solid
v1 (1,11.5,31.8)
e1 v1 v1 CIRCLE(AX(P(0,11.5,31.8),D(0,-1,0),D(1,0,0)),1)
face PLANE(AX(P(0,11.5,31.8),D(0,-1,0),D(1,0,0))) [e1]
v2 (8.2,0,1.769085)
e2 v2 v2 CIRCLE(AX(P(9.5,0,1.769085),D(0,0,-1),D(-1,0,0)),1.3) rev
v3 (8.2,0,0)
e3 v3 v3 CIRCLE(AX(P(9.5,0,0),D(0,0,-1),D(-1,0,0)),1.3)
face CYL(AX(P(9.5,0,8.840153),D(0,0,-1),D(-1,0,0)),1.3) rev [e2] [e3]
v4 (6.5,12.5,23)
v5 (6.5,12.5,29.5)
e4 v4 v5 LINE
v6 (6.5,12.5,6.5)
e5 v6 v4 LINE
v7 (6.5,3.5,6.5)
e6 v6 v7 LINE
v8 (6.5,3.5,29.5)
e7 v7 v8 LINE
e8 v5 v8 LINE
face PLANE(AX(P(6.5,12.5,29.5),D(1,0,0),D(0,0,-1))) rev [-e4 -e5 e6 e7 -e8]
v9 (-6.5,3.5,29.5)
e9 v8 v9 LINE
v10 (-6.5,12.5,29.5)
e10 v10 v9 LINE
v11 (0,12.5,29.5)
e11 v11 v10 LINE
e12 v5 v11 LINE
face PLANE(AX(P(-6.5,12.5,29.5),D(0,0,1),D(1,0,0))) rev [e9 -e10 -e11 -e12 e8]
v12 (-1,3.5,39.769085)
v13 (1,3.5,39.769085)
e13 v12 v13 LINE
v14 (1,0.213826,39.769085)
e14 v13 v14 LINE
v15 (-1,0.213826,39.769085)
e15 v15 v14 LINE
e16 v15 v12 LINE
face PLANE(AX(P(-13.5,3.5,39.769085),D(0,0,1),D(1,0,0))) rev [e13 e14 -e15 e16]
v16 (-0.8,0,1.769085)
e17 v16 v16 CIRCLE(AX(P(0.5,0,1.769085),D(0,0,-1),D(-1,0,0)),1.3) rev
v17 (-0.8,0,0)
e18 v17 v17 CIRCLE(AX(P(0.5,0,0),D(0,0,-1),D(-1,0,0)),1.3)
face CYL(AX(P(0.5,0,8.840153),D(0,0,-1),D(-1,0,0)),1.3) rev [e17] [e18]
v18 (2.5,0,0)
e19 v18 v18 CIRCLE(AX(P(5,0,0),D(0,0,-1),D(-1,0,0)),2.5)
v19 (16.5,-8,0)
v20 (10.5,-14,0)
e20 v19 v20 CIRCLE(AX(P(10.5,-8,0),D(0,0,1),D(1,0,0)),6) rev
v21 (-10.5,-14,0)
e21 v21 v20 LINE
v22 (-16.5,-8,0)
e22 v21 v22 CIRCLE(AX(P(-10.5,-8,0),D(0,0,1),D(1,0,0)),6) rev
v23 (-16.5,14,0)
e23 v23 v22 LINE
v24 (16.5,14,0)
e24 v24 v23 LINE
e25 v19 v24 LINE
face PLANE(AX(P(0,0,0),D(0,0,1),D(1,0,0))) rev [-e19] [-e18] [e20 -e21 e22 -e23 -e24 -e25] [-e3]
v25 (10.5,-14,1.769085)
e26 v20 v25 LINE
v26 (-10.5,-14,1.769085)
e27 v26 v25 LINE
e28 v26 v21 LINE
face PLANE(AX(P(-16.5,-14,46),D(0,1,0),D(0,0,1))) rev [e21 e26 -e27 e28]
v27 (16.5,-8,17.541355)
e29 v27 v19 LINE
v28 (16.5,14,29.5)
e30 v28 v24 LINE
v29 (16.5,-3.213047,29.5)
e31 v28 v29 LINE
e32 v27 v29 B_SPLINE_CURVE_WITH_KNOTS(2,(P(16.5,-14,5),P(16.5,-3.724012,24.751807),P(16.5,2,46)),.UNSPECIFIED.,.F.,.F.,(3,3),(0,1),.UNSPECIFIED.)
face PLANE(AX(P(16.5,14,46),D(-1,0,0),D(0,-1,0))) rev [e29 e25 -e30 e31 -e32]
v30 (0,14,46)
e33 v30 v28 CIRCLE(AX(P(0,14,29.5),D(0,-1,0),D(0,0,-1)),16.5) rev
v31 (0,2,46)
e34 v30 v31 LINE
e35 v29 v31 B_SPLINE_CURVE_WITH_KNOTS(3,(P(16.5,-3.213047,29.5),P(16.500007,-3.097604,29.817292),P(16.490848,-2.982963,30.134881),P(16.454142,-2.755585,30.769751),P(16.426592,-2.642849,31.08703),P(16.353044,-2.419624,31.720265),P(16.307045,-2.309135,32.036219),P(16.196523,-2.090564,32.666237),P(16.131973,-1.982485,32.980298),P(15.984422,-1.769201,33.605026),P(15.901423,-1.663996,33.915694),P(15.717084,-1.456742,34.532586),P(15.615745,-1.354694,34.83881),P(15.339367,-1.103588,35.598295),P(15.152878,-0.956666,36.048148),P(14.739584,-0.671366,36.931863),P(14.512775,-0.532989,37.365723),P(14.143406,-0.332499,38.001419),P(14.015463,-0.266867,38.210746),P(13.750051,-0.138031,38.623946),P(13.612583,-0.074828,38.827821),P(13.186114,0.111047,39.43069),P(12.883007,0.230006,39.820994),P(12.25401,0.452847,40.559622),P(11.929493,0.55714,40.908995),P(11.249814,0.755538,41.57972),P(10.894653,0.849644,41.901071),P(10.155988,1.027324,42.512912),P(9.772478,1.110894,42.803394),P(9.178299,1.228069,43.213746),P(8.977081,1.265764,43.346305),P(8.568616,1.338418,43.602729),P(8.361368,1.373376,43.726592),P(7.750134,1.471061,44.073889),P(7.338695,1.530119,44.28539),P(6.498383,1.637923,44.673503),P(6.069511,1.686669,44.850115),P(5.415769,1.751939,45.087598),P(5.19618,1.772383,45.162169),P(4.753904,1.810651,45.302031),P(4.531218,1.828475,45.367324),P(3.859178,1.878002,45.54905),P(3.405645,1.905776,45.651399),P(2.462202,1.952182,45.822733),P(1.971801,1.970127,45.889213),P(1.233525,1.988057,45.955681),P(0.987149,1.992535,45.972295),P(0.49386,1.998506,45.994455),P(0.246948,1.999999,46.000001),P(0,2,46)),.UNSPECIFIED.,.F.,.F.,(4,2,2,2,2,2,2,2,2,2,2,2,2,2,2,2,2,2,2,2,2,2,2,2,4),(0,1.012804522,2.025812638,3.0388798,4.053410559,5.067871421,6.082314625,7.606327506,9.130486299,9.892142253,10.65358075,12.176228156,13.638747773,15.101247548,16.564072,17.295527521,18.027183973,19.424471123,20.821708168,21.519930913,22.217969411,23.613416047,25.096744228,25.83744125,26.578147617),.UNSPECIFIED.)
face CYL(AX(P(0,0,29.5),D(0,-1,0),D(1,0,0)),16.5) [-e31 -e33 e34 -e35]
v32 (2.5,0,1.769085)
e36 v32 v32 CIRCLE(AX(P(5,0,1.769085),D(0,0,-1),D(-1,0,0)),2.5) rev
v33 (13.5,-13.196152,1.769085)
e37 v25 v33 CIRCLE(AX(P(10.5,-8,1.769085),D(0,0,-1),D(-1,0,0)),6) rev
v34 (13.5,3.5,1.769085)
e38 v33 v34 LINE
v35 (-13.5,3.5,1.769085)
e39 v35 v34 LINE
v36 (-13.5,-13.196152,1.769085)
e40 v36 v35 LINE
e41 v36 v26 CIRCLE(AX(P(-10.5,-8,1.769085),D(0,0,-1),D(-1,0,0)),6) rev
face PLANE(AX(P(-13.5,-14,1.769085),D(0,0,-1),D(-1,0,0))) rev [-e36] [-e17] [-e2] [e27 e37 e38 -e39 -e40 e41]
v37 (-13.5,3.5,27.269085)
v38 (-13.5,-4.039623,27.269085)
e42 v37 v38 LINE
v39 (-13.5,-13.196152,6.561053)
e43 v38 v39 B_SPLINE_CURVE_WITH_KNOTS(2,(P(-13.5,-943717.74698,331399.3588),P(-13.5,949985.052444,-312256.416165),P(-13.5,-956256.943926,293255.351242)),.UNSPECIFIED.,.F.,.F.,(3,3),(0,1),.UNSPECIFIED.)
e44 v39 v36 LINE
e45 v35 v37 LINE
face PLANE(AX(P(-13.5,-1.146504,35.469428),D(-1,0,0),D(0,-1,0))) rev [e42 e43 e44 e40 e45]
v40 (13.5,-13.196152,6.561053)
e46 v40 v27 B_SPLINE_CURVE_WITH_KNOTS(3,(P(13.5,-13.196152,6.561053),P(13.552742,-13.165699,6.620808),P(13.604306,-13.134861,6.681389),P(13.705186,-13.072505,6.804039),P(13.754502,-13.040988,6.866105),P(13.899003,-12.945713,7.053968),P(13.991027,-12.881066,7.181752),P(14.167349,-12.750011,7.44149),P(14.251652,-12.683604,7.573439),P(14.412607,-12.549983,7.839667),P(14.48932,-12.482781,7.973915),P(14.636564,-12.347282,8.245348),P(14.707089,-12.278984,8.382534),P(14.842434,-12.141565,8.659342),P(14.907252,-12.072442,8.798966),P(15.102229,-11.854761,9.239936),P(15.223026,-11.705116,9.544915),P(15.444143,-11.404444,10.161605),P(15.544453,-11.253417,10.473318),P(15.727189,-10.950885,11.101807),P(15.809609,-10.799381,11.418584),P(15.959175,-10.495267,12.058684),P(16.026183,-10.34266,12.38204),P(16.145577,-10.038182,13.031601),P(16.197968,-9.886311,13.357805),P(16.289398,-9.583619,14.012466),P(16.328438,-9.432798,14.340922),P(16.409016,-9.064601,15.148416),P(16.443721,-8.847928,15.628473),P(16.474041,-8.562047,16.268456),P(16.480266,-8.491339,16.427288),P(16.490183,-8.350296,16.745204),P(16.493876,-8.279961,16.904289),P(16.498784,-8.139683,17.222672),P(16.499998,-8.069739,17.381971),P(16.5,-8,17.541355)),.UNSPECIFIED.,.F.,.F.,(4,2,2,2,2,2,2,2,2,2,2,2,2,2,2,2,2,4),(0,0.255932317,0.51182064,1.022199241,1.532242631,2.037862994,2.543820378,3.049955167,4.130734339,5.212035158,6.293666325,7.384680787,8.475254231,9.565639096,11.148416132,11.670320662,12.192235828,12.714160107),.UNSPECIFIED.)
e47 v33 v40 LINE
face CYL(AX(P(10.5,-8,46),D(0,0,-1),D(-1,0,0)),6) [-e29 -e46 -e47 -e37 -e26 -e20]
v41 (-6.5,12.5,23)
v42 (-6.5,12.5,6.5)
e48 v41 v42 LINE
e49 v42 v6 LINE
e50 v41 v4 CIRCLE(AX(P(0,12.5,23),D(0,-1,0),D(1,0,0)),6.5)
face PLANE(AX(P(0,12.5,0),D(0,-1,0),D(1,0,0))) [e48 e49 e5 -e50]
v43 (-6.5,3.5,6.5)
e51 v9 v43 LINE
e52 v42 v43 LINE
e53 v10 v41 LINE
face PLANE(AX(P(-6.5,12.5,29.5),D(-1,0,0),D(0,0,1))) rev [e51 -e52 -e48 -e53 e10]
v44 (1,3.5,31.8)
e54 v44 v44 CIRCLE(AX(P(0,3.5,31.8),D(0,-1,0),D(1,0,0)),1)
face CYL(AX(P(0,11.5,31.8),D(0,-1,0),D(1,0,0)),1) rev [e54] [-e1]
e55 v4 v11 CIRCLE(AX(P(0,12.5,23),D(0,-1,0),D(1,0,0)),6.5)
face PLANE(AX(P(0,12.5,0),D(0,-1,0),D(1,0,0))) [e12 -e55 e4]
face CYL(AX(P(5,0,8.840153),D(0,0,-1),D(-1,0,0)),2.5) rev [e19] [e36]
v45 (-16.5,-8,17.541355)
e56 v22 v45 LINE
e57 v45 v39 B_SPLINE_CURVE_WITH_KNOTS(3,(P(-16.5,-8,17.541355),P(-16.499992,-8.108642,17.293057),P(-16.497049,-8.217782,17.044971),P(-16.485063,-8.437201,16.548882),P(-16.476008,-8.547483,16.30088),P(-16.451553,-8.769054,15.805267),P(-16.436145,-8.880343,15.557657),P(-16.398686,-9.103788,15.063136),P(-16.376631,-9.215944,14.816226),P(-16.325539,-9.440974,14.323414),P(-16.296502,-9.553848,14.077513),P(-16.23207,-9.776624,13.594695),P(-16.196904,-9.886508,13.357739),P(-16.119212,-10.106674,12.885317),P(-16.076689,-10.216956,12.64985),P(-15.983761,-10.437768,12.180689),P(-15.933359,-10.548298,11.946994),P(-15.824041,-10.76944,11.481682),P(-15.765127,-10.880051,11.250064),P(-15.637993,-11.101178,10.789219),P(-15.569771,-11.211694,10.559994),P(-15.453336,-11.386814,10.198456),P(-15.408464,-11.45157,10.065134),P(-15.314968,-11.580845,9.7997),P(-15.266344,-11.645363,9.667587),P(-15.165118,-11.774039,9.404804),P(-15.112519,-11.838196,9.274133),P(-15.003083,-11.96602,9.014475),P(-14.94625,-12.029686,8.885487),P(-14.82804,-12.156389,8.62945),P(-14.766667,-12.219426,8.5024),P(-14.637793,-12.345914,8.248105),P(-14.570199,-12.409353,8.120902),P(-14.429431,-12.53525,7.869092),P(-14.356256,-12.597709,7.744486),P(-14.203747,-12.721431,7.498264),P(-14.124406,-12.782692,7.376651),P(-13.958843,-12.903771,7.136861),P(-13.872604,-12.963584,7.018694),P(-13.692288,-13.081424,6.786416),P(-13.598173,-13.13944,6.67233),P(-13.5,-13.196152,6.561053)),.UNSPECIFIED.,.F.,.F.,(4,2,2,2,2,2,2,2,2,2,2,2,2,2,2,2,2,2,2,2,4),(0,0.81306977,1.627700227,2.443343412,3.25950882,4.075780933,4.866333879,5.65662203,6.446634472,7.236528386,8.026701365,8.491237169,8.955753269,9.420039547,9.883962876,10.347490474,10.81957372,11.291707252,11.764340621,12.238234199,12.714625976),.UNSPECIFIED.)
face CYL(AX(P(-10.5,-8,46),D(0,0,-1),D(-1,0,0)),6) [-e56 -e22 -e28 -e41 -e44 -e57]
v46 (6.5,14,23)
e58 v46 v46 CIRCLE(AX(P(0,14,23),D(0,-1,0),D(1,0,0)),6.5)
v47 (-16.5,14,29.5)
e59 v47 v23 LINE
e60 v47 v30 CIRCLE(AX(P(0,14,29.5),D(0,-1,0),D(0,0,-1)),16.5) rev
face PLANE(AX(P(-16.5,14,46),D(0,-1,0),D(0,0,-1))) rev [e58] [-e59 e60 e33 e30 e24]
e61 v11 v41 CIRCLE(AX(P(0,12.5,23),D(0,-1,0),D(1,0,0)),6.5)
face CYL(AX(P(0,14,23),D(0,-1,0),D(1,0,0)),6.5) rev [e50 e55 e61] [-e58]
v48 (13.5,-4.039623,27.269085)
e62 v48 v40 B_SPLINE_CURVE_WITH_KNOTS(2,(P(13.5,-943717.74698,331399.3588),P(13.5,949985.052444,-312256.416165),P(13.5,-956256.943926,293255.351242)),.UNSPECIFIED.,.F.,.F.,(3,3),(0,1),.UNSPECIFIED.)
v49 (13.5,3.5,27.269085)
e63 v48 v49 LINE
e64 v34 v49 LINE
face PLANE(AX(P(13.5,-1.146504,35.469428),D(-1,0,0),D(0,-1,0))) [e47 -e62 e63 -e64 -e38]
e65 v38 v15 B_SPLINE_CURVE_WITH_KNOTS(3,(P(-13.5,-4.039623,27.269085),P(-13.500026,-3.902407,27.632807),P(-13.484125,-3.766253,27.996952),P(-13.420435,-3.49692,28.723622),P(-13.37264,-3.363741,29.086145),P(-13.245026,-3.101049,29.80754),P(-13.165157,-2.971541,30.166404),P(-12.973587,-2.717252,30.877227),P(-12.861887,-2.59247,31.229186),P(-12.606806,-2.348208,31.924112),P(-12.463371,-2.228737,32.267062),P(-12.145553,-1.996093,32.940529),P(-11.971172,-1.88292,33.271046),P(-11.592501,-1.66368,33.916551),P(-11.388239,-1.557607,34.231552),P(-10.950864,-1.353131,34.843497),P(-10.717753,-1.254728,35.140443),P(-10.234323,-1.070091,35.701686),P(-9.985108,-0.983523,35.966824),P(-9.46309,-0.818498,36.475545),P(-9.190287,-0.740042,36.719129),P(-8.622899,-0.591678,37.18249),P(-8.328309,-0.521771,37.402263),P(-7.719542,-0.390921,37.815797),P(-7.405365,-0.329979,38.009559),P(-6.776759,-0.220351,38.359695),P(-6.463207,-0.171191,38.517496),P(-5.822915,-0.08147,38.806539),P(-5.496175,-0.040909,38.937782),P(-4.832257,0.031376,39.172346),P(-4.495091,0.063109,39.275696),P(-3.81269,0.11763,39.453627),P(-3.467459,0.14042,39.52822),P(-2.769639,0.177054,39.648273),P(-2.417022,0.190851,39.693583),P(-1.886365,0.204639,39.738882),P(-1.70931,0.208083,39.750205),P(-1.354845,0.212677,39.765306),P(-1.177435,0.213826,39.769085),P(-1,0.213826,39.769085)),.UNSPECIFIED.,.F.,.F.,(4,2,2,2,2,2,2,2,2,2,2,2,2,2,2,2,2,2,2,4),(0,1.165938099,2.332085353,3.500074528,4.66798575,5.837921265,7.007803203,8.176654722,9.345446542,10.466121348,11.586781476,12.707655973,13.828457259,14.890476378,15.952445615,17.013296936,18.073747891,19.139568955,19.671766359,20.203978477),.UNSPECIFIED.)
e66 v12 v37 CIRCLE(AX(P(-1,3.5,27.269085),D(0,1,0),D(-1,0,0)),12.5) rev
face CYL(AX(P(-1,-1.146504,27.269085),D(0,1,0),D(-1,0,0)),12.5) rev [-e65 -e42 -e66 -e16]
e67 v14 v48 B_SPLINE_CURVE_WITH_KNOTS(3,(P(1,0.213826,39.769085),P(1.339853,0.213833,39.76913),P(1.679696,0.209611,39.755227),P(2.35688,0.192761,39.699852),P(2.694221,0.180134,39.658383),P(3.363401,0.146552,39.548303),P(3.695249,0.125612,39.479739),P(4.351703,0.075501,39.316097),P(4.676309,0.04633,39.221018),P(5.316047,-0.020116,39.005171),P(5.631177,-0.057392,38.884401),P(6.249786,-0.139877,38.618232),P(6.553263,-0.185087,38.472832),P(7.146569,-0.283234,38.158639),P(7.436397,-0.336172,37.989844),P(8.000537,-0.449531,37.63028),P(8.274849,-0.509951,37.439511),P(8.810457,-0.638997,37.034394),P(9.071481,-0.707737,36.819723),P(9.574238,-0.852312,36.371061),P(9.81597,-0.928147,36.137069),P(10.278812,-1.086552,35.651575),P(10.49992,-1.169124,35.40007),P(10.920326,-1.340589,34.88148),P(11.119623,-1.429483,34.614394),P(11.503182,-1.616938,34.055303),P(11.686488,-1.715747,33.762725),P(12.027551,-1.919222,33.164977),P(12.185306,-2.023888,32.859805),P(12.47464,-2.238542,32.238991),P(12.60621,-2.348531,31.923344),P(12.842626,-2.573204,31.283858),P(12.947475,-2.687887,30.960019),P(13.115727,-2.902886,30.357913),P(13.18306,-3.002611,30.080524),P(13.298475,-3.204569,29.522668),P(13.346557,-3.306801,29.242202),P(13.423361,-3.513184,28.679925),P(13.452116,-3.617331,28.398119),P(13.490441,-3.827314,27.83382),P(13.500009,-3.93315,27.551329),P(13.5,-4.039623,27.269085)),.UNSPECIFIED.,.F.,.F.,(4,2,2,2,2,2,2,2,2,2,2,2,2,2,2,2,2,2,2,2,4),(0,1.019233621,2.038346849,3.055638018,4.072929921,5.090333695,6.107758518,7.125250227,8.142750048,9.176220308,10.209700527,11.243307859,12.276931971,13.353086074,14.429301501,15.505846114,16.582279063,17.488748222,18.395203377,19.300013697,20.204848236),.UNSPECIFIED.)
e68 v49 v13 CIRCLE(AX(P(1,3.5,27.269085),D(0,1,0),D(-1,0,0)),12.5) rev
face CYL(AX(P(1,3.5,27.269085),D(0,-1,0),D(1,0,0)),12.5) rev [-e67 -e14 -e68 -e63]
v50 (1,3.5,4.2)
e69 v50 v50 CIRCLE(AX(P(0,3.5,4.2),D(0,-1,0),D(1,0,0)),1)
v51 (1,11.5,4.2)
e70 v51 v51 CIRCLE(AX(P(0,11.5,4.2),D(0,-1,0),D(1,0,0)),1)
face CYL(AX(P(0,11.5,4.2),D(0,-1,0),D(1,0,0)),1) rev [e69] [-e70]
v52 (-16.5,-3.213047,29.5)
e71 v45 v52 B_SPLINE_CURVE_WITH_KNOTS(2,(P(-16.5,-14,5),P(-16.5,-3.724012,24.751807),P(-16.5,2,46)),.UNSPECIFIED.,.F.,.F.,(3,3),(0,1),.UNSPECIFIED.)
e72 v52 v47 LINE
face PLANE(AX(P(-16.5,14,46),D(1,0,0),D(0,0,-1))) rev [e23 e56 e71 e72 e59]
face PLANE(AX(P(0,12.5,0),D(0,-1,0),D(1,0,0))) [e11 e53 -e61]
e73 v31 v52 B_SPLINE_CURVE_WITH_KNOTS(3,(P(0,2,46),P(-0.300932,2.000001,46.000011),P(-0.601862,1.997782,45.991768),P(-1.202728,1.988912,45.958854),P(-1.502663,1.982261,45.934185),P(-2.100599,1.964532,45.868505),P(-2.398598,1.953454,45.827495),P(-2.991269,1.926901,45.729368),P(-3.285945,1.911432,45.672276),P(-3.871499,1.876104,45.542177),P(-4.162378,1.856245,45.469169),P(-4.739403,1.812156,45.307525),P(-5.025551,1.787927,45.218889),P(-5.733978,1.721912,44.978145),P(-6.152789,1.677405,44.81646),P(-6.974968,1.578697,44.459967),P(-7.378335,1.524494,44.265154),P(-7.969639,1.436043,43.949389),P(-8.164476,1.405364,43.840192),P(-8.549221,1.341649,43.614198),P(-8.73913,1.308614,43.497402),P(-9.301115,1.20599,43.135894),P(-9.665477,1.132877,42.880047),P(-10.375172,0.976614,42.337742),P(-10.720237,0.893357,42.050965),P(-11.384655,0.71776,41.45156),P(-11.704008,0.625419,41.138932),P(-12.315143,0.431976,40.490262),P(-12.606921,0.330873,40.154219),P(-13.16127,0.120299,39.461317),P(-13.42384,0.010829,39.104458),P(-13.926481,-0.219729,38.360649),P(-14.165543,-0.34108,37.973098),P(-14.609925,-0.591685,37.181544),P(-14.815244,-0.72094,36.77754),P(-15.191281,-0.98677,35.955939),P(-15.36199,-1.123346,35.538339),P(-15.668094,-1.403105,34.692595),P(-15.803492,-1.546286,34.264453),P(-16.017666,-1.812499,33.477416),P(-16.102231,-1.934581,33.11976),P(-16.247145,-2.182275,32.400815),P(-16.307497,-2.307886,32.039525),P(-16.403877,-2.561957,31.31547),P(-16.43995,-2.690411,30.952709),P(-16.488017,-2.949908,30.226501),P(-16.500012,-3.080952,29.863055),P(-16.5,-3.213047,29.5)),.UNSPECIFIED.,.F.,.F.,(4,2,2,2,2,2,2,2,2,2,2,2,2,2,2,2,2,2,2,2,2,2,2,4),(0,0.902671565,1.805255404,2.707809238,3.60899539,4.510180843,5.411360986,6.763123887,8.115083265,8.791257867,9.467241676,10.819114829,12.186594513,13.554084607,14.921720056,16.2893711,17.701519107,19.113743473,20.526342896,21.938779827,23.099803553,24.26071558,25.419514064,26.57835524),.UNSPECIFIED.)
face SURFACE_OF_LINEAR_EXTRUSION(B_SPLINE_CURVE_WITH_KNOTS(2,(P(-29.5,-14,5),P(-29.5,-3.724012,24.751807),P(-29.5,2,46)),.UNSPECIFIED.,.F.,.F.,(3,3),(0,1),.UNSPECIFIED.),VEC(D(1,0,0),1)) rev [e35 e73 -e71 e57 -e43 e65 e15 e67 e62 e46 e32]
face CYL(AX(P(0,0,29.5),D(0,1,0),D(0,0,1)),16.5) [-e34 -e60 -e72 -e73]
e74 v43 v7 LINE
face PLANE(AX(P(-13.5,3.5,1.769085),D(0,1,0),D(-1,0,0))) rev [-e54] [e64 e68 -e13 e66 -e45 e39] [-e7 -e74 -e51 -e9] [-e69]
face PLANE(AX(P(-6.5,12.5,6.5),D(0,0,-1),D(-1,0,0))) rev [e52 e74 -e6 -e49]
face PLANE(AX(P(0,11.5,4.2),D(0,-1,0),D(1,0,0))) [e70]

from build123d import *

# Parameters (mm, degrees)
SKETCH1_W           = 33
SKETCH1_H           = 28
BOSS_EXTRUDE1_DEPTH = 46
CUT_EXTRUDE1_DEPTH  = 46
CUT_EXTRUDE2_START  = -3
CUT_EXTRUDE2_DEPTH  = 27
FILLET2_R           = 12.5
FILLET3_R           = 16.5
FILLET4_R           = 6
SKETCH4_W           = 13
SKETCH4_H           = 23
CUT_EXTRUDE3_DEPTH  = 9
SKETCH5_R           = 6.5
CUT_EXTRUDE4_DEPTH  = 56.592265809
SKETCH6_R           = 1
CUT_EXTRUDE5_DEPTH  = 8
SKETCH7_R           = 1.3
SKETCH7_R_2         = 2.5
CUT_EXTRUDE6_DEPTH  = 1.769084801


with BuildPart() as part:
    # Sketch1 → Boss-Extrude1 (new body)
    with BuildSketch(Plane.XY):
        Rectangle(SKETCH1_W, SKETCH1_H)
    extrude(amount=BOSS_EXTRUDE1_DEPTH)

    # Sketch2 → Cut-Extrude1 (cut)
    with BuildSketch(Plane(origin=(16.5, 0, 0), x_dir=(0, 0, -1), z_dir=(1, 0, 0))):
        with BuildLine():
            Line((-46, 2), (-46, -14))
            Line((-46, -14), (-5, -14))
            add(Edge.make_bspline(
                [(-5, -14), (-24.751807392, -3.724011785), (-46, 2)],
                knots=[0, 0, 0, 1, 1, 1], degree=2))
        make_face()
    extrude(amount=-CUT_EXTRUDE1_DEPTH, mode=Mode.SUBTRACT)

    # Sketch3 → Cut-Extrude2 (cut)
    with BuildSketch(Plane(origin=(16.5, 0, 0), x_dir=(0, 0, -1), z_dir=(1, 0, 0)).offset(CUT_EXTRUDE2_START)):
        with BuildLine():
            Line((-5, -14), (-1.769084801, -14))
            Line((-1.769084801, -14), (-1.769084801, 3.5))
            Line((-1.769084801, 3.5), (-39.769084801, 3.5))
            Line((-39.769084801, 3.5), (-39.769084801, 0.213825967))
            add(Edge.make_bspline(
                [(-5, -14), (-21.840644779, -5.238560409), (-39.769084801, 0.213825967)],
                knots=[0, 0, 0, 1, 1, 1], degree=2))
        make_face()
    extrude(amount=-CUT_EXTRUDE2_DEPTH, mode=Mode.SUBTRACT)

    # Fillet2
    fillet2_edges = [part.edges().sort_by_distance(p)[0] for p in [
        (13.5, 1.856912984, 39.769084801),
        (-13.5, 1.856912984, 39.769084801),
    ]]
    fillet(fillet2_edges, radius=FILLET2_R)

    # Fillet3
    fillet3_edges = [part.edges().sort_by_distance(p)[0] for p in [
        (16.5, 8, 46),
        (-16.5, 8, 46),
    ]]
    fillet(fillet3_edges, radius=FILLET3_R - 0.0001)  # a hair under: the kernel refuses the full size

    # Fillet4
    fillet4_edges = [part.edges().sort_by_distance(p)[0] for p in [
        (-16.5, -14, 2.5),
        (16.5, -14, 2.5),
    ]]
    fillet(fillet4_edges, radius=FILLET4_R)

    # Sketch4 → Cut-Extrude3 (cut)
    with BuildSketch(Plane.XZ.offset(-3.5)):
        with Locations((0, 18)):
            Rectangle(SKETCH4_W, SKETCH4_H)
    extrude(amount=-CUT_EXTRUDE3_DEPTH, mode=Mode.SUBTRACT)

    # Sketch5 → Cut-Extrude4 (cut, through all)
    with BuildSketch(Plane.XZ.offset(-12.5)):
        with Locations((0, 23)):
            Circle(SKETCH5_R)
    extrude(amount=-CUT_EXTRUDE4_DEPTH, mode=Mode.SUBTRACT)

    # Sketch6 → Cut-Extrude5 (cut)
    with BuildSketch(Plane.XZ.offset(-3.5)):
        with Locations((0, 31.8)):
            Circle(SKETCH6_R)
        with Locations((0, 4.2)):
            Circle(SKETCH6_R)
    extrude(amount=-CUT_EXTRUDE5_DEPTH, mode=Mode.SUBTRACT)

    # Sketch7 → Cut-Extrude6 (cut)
    with BuildSketch(Plane(origin=(0, 0, 0), x_dir=(-1, 0, 0), z_dir=(0, 0, -1))):
        with Locations((-9.5, 0)):
            Circle(SKETCH7_R)
        with Locations((-5, 0)):
            Circle(SKETCH7_R_2)
        with Locations((-0.5, 0)):
            Circle(SKETCH7_R)
    extrude(amount=-CUT_EXTRUDE6_DEPTH, mode=Mode.SUBTRACT)


solid = part.part
